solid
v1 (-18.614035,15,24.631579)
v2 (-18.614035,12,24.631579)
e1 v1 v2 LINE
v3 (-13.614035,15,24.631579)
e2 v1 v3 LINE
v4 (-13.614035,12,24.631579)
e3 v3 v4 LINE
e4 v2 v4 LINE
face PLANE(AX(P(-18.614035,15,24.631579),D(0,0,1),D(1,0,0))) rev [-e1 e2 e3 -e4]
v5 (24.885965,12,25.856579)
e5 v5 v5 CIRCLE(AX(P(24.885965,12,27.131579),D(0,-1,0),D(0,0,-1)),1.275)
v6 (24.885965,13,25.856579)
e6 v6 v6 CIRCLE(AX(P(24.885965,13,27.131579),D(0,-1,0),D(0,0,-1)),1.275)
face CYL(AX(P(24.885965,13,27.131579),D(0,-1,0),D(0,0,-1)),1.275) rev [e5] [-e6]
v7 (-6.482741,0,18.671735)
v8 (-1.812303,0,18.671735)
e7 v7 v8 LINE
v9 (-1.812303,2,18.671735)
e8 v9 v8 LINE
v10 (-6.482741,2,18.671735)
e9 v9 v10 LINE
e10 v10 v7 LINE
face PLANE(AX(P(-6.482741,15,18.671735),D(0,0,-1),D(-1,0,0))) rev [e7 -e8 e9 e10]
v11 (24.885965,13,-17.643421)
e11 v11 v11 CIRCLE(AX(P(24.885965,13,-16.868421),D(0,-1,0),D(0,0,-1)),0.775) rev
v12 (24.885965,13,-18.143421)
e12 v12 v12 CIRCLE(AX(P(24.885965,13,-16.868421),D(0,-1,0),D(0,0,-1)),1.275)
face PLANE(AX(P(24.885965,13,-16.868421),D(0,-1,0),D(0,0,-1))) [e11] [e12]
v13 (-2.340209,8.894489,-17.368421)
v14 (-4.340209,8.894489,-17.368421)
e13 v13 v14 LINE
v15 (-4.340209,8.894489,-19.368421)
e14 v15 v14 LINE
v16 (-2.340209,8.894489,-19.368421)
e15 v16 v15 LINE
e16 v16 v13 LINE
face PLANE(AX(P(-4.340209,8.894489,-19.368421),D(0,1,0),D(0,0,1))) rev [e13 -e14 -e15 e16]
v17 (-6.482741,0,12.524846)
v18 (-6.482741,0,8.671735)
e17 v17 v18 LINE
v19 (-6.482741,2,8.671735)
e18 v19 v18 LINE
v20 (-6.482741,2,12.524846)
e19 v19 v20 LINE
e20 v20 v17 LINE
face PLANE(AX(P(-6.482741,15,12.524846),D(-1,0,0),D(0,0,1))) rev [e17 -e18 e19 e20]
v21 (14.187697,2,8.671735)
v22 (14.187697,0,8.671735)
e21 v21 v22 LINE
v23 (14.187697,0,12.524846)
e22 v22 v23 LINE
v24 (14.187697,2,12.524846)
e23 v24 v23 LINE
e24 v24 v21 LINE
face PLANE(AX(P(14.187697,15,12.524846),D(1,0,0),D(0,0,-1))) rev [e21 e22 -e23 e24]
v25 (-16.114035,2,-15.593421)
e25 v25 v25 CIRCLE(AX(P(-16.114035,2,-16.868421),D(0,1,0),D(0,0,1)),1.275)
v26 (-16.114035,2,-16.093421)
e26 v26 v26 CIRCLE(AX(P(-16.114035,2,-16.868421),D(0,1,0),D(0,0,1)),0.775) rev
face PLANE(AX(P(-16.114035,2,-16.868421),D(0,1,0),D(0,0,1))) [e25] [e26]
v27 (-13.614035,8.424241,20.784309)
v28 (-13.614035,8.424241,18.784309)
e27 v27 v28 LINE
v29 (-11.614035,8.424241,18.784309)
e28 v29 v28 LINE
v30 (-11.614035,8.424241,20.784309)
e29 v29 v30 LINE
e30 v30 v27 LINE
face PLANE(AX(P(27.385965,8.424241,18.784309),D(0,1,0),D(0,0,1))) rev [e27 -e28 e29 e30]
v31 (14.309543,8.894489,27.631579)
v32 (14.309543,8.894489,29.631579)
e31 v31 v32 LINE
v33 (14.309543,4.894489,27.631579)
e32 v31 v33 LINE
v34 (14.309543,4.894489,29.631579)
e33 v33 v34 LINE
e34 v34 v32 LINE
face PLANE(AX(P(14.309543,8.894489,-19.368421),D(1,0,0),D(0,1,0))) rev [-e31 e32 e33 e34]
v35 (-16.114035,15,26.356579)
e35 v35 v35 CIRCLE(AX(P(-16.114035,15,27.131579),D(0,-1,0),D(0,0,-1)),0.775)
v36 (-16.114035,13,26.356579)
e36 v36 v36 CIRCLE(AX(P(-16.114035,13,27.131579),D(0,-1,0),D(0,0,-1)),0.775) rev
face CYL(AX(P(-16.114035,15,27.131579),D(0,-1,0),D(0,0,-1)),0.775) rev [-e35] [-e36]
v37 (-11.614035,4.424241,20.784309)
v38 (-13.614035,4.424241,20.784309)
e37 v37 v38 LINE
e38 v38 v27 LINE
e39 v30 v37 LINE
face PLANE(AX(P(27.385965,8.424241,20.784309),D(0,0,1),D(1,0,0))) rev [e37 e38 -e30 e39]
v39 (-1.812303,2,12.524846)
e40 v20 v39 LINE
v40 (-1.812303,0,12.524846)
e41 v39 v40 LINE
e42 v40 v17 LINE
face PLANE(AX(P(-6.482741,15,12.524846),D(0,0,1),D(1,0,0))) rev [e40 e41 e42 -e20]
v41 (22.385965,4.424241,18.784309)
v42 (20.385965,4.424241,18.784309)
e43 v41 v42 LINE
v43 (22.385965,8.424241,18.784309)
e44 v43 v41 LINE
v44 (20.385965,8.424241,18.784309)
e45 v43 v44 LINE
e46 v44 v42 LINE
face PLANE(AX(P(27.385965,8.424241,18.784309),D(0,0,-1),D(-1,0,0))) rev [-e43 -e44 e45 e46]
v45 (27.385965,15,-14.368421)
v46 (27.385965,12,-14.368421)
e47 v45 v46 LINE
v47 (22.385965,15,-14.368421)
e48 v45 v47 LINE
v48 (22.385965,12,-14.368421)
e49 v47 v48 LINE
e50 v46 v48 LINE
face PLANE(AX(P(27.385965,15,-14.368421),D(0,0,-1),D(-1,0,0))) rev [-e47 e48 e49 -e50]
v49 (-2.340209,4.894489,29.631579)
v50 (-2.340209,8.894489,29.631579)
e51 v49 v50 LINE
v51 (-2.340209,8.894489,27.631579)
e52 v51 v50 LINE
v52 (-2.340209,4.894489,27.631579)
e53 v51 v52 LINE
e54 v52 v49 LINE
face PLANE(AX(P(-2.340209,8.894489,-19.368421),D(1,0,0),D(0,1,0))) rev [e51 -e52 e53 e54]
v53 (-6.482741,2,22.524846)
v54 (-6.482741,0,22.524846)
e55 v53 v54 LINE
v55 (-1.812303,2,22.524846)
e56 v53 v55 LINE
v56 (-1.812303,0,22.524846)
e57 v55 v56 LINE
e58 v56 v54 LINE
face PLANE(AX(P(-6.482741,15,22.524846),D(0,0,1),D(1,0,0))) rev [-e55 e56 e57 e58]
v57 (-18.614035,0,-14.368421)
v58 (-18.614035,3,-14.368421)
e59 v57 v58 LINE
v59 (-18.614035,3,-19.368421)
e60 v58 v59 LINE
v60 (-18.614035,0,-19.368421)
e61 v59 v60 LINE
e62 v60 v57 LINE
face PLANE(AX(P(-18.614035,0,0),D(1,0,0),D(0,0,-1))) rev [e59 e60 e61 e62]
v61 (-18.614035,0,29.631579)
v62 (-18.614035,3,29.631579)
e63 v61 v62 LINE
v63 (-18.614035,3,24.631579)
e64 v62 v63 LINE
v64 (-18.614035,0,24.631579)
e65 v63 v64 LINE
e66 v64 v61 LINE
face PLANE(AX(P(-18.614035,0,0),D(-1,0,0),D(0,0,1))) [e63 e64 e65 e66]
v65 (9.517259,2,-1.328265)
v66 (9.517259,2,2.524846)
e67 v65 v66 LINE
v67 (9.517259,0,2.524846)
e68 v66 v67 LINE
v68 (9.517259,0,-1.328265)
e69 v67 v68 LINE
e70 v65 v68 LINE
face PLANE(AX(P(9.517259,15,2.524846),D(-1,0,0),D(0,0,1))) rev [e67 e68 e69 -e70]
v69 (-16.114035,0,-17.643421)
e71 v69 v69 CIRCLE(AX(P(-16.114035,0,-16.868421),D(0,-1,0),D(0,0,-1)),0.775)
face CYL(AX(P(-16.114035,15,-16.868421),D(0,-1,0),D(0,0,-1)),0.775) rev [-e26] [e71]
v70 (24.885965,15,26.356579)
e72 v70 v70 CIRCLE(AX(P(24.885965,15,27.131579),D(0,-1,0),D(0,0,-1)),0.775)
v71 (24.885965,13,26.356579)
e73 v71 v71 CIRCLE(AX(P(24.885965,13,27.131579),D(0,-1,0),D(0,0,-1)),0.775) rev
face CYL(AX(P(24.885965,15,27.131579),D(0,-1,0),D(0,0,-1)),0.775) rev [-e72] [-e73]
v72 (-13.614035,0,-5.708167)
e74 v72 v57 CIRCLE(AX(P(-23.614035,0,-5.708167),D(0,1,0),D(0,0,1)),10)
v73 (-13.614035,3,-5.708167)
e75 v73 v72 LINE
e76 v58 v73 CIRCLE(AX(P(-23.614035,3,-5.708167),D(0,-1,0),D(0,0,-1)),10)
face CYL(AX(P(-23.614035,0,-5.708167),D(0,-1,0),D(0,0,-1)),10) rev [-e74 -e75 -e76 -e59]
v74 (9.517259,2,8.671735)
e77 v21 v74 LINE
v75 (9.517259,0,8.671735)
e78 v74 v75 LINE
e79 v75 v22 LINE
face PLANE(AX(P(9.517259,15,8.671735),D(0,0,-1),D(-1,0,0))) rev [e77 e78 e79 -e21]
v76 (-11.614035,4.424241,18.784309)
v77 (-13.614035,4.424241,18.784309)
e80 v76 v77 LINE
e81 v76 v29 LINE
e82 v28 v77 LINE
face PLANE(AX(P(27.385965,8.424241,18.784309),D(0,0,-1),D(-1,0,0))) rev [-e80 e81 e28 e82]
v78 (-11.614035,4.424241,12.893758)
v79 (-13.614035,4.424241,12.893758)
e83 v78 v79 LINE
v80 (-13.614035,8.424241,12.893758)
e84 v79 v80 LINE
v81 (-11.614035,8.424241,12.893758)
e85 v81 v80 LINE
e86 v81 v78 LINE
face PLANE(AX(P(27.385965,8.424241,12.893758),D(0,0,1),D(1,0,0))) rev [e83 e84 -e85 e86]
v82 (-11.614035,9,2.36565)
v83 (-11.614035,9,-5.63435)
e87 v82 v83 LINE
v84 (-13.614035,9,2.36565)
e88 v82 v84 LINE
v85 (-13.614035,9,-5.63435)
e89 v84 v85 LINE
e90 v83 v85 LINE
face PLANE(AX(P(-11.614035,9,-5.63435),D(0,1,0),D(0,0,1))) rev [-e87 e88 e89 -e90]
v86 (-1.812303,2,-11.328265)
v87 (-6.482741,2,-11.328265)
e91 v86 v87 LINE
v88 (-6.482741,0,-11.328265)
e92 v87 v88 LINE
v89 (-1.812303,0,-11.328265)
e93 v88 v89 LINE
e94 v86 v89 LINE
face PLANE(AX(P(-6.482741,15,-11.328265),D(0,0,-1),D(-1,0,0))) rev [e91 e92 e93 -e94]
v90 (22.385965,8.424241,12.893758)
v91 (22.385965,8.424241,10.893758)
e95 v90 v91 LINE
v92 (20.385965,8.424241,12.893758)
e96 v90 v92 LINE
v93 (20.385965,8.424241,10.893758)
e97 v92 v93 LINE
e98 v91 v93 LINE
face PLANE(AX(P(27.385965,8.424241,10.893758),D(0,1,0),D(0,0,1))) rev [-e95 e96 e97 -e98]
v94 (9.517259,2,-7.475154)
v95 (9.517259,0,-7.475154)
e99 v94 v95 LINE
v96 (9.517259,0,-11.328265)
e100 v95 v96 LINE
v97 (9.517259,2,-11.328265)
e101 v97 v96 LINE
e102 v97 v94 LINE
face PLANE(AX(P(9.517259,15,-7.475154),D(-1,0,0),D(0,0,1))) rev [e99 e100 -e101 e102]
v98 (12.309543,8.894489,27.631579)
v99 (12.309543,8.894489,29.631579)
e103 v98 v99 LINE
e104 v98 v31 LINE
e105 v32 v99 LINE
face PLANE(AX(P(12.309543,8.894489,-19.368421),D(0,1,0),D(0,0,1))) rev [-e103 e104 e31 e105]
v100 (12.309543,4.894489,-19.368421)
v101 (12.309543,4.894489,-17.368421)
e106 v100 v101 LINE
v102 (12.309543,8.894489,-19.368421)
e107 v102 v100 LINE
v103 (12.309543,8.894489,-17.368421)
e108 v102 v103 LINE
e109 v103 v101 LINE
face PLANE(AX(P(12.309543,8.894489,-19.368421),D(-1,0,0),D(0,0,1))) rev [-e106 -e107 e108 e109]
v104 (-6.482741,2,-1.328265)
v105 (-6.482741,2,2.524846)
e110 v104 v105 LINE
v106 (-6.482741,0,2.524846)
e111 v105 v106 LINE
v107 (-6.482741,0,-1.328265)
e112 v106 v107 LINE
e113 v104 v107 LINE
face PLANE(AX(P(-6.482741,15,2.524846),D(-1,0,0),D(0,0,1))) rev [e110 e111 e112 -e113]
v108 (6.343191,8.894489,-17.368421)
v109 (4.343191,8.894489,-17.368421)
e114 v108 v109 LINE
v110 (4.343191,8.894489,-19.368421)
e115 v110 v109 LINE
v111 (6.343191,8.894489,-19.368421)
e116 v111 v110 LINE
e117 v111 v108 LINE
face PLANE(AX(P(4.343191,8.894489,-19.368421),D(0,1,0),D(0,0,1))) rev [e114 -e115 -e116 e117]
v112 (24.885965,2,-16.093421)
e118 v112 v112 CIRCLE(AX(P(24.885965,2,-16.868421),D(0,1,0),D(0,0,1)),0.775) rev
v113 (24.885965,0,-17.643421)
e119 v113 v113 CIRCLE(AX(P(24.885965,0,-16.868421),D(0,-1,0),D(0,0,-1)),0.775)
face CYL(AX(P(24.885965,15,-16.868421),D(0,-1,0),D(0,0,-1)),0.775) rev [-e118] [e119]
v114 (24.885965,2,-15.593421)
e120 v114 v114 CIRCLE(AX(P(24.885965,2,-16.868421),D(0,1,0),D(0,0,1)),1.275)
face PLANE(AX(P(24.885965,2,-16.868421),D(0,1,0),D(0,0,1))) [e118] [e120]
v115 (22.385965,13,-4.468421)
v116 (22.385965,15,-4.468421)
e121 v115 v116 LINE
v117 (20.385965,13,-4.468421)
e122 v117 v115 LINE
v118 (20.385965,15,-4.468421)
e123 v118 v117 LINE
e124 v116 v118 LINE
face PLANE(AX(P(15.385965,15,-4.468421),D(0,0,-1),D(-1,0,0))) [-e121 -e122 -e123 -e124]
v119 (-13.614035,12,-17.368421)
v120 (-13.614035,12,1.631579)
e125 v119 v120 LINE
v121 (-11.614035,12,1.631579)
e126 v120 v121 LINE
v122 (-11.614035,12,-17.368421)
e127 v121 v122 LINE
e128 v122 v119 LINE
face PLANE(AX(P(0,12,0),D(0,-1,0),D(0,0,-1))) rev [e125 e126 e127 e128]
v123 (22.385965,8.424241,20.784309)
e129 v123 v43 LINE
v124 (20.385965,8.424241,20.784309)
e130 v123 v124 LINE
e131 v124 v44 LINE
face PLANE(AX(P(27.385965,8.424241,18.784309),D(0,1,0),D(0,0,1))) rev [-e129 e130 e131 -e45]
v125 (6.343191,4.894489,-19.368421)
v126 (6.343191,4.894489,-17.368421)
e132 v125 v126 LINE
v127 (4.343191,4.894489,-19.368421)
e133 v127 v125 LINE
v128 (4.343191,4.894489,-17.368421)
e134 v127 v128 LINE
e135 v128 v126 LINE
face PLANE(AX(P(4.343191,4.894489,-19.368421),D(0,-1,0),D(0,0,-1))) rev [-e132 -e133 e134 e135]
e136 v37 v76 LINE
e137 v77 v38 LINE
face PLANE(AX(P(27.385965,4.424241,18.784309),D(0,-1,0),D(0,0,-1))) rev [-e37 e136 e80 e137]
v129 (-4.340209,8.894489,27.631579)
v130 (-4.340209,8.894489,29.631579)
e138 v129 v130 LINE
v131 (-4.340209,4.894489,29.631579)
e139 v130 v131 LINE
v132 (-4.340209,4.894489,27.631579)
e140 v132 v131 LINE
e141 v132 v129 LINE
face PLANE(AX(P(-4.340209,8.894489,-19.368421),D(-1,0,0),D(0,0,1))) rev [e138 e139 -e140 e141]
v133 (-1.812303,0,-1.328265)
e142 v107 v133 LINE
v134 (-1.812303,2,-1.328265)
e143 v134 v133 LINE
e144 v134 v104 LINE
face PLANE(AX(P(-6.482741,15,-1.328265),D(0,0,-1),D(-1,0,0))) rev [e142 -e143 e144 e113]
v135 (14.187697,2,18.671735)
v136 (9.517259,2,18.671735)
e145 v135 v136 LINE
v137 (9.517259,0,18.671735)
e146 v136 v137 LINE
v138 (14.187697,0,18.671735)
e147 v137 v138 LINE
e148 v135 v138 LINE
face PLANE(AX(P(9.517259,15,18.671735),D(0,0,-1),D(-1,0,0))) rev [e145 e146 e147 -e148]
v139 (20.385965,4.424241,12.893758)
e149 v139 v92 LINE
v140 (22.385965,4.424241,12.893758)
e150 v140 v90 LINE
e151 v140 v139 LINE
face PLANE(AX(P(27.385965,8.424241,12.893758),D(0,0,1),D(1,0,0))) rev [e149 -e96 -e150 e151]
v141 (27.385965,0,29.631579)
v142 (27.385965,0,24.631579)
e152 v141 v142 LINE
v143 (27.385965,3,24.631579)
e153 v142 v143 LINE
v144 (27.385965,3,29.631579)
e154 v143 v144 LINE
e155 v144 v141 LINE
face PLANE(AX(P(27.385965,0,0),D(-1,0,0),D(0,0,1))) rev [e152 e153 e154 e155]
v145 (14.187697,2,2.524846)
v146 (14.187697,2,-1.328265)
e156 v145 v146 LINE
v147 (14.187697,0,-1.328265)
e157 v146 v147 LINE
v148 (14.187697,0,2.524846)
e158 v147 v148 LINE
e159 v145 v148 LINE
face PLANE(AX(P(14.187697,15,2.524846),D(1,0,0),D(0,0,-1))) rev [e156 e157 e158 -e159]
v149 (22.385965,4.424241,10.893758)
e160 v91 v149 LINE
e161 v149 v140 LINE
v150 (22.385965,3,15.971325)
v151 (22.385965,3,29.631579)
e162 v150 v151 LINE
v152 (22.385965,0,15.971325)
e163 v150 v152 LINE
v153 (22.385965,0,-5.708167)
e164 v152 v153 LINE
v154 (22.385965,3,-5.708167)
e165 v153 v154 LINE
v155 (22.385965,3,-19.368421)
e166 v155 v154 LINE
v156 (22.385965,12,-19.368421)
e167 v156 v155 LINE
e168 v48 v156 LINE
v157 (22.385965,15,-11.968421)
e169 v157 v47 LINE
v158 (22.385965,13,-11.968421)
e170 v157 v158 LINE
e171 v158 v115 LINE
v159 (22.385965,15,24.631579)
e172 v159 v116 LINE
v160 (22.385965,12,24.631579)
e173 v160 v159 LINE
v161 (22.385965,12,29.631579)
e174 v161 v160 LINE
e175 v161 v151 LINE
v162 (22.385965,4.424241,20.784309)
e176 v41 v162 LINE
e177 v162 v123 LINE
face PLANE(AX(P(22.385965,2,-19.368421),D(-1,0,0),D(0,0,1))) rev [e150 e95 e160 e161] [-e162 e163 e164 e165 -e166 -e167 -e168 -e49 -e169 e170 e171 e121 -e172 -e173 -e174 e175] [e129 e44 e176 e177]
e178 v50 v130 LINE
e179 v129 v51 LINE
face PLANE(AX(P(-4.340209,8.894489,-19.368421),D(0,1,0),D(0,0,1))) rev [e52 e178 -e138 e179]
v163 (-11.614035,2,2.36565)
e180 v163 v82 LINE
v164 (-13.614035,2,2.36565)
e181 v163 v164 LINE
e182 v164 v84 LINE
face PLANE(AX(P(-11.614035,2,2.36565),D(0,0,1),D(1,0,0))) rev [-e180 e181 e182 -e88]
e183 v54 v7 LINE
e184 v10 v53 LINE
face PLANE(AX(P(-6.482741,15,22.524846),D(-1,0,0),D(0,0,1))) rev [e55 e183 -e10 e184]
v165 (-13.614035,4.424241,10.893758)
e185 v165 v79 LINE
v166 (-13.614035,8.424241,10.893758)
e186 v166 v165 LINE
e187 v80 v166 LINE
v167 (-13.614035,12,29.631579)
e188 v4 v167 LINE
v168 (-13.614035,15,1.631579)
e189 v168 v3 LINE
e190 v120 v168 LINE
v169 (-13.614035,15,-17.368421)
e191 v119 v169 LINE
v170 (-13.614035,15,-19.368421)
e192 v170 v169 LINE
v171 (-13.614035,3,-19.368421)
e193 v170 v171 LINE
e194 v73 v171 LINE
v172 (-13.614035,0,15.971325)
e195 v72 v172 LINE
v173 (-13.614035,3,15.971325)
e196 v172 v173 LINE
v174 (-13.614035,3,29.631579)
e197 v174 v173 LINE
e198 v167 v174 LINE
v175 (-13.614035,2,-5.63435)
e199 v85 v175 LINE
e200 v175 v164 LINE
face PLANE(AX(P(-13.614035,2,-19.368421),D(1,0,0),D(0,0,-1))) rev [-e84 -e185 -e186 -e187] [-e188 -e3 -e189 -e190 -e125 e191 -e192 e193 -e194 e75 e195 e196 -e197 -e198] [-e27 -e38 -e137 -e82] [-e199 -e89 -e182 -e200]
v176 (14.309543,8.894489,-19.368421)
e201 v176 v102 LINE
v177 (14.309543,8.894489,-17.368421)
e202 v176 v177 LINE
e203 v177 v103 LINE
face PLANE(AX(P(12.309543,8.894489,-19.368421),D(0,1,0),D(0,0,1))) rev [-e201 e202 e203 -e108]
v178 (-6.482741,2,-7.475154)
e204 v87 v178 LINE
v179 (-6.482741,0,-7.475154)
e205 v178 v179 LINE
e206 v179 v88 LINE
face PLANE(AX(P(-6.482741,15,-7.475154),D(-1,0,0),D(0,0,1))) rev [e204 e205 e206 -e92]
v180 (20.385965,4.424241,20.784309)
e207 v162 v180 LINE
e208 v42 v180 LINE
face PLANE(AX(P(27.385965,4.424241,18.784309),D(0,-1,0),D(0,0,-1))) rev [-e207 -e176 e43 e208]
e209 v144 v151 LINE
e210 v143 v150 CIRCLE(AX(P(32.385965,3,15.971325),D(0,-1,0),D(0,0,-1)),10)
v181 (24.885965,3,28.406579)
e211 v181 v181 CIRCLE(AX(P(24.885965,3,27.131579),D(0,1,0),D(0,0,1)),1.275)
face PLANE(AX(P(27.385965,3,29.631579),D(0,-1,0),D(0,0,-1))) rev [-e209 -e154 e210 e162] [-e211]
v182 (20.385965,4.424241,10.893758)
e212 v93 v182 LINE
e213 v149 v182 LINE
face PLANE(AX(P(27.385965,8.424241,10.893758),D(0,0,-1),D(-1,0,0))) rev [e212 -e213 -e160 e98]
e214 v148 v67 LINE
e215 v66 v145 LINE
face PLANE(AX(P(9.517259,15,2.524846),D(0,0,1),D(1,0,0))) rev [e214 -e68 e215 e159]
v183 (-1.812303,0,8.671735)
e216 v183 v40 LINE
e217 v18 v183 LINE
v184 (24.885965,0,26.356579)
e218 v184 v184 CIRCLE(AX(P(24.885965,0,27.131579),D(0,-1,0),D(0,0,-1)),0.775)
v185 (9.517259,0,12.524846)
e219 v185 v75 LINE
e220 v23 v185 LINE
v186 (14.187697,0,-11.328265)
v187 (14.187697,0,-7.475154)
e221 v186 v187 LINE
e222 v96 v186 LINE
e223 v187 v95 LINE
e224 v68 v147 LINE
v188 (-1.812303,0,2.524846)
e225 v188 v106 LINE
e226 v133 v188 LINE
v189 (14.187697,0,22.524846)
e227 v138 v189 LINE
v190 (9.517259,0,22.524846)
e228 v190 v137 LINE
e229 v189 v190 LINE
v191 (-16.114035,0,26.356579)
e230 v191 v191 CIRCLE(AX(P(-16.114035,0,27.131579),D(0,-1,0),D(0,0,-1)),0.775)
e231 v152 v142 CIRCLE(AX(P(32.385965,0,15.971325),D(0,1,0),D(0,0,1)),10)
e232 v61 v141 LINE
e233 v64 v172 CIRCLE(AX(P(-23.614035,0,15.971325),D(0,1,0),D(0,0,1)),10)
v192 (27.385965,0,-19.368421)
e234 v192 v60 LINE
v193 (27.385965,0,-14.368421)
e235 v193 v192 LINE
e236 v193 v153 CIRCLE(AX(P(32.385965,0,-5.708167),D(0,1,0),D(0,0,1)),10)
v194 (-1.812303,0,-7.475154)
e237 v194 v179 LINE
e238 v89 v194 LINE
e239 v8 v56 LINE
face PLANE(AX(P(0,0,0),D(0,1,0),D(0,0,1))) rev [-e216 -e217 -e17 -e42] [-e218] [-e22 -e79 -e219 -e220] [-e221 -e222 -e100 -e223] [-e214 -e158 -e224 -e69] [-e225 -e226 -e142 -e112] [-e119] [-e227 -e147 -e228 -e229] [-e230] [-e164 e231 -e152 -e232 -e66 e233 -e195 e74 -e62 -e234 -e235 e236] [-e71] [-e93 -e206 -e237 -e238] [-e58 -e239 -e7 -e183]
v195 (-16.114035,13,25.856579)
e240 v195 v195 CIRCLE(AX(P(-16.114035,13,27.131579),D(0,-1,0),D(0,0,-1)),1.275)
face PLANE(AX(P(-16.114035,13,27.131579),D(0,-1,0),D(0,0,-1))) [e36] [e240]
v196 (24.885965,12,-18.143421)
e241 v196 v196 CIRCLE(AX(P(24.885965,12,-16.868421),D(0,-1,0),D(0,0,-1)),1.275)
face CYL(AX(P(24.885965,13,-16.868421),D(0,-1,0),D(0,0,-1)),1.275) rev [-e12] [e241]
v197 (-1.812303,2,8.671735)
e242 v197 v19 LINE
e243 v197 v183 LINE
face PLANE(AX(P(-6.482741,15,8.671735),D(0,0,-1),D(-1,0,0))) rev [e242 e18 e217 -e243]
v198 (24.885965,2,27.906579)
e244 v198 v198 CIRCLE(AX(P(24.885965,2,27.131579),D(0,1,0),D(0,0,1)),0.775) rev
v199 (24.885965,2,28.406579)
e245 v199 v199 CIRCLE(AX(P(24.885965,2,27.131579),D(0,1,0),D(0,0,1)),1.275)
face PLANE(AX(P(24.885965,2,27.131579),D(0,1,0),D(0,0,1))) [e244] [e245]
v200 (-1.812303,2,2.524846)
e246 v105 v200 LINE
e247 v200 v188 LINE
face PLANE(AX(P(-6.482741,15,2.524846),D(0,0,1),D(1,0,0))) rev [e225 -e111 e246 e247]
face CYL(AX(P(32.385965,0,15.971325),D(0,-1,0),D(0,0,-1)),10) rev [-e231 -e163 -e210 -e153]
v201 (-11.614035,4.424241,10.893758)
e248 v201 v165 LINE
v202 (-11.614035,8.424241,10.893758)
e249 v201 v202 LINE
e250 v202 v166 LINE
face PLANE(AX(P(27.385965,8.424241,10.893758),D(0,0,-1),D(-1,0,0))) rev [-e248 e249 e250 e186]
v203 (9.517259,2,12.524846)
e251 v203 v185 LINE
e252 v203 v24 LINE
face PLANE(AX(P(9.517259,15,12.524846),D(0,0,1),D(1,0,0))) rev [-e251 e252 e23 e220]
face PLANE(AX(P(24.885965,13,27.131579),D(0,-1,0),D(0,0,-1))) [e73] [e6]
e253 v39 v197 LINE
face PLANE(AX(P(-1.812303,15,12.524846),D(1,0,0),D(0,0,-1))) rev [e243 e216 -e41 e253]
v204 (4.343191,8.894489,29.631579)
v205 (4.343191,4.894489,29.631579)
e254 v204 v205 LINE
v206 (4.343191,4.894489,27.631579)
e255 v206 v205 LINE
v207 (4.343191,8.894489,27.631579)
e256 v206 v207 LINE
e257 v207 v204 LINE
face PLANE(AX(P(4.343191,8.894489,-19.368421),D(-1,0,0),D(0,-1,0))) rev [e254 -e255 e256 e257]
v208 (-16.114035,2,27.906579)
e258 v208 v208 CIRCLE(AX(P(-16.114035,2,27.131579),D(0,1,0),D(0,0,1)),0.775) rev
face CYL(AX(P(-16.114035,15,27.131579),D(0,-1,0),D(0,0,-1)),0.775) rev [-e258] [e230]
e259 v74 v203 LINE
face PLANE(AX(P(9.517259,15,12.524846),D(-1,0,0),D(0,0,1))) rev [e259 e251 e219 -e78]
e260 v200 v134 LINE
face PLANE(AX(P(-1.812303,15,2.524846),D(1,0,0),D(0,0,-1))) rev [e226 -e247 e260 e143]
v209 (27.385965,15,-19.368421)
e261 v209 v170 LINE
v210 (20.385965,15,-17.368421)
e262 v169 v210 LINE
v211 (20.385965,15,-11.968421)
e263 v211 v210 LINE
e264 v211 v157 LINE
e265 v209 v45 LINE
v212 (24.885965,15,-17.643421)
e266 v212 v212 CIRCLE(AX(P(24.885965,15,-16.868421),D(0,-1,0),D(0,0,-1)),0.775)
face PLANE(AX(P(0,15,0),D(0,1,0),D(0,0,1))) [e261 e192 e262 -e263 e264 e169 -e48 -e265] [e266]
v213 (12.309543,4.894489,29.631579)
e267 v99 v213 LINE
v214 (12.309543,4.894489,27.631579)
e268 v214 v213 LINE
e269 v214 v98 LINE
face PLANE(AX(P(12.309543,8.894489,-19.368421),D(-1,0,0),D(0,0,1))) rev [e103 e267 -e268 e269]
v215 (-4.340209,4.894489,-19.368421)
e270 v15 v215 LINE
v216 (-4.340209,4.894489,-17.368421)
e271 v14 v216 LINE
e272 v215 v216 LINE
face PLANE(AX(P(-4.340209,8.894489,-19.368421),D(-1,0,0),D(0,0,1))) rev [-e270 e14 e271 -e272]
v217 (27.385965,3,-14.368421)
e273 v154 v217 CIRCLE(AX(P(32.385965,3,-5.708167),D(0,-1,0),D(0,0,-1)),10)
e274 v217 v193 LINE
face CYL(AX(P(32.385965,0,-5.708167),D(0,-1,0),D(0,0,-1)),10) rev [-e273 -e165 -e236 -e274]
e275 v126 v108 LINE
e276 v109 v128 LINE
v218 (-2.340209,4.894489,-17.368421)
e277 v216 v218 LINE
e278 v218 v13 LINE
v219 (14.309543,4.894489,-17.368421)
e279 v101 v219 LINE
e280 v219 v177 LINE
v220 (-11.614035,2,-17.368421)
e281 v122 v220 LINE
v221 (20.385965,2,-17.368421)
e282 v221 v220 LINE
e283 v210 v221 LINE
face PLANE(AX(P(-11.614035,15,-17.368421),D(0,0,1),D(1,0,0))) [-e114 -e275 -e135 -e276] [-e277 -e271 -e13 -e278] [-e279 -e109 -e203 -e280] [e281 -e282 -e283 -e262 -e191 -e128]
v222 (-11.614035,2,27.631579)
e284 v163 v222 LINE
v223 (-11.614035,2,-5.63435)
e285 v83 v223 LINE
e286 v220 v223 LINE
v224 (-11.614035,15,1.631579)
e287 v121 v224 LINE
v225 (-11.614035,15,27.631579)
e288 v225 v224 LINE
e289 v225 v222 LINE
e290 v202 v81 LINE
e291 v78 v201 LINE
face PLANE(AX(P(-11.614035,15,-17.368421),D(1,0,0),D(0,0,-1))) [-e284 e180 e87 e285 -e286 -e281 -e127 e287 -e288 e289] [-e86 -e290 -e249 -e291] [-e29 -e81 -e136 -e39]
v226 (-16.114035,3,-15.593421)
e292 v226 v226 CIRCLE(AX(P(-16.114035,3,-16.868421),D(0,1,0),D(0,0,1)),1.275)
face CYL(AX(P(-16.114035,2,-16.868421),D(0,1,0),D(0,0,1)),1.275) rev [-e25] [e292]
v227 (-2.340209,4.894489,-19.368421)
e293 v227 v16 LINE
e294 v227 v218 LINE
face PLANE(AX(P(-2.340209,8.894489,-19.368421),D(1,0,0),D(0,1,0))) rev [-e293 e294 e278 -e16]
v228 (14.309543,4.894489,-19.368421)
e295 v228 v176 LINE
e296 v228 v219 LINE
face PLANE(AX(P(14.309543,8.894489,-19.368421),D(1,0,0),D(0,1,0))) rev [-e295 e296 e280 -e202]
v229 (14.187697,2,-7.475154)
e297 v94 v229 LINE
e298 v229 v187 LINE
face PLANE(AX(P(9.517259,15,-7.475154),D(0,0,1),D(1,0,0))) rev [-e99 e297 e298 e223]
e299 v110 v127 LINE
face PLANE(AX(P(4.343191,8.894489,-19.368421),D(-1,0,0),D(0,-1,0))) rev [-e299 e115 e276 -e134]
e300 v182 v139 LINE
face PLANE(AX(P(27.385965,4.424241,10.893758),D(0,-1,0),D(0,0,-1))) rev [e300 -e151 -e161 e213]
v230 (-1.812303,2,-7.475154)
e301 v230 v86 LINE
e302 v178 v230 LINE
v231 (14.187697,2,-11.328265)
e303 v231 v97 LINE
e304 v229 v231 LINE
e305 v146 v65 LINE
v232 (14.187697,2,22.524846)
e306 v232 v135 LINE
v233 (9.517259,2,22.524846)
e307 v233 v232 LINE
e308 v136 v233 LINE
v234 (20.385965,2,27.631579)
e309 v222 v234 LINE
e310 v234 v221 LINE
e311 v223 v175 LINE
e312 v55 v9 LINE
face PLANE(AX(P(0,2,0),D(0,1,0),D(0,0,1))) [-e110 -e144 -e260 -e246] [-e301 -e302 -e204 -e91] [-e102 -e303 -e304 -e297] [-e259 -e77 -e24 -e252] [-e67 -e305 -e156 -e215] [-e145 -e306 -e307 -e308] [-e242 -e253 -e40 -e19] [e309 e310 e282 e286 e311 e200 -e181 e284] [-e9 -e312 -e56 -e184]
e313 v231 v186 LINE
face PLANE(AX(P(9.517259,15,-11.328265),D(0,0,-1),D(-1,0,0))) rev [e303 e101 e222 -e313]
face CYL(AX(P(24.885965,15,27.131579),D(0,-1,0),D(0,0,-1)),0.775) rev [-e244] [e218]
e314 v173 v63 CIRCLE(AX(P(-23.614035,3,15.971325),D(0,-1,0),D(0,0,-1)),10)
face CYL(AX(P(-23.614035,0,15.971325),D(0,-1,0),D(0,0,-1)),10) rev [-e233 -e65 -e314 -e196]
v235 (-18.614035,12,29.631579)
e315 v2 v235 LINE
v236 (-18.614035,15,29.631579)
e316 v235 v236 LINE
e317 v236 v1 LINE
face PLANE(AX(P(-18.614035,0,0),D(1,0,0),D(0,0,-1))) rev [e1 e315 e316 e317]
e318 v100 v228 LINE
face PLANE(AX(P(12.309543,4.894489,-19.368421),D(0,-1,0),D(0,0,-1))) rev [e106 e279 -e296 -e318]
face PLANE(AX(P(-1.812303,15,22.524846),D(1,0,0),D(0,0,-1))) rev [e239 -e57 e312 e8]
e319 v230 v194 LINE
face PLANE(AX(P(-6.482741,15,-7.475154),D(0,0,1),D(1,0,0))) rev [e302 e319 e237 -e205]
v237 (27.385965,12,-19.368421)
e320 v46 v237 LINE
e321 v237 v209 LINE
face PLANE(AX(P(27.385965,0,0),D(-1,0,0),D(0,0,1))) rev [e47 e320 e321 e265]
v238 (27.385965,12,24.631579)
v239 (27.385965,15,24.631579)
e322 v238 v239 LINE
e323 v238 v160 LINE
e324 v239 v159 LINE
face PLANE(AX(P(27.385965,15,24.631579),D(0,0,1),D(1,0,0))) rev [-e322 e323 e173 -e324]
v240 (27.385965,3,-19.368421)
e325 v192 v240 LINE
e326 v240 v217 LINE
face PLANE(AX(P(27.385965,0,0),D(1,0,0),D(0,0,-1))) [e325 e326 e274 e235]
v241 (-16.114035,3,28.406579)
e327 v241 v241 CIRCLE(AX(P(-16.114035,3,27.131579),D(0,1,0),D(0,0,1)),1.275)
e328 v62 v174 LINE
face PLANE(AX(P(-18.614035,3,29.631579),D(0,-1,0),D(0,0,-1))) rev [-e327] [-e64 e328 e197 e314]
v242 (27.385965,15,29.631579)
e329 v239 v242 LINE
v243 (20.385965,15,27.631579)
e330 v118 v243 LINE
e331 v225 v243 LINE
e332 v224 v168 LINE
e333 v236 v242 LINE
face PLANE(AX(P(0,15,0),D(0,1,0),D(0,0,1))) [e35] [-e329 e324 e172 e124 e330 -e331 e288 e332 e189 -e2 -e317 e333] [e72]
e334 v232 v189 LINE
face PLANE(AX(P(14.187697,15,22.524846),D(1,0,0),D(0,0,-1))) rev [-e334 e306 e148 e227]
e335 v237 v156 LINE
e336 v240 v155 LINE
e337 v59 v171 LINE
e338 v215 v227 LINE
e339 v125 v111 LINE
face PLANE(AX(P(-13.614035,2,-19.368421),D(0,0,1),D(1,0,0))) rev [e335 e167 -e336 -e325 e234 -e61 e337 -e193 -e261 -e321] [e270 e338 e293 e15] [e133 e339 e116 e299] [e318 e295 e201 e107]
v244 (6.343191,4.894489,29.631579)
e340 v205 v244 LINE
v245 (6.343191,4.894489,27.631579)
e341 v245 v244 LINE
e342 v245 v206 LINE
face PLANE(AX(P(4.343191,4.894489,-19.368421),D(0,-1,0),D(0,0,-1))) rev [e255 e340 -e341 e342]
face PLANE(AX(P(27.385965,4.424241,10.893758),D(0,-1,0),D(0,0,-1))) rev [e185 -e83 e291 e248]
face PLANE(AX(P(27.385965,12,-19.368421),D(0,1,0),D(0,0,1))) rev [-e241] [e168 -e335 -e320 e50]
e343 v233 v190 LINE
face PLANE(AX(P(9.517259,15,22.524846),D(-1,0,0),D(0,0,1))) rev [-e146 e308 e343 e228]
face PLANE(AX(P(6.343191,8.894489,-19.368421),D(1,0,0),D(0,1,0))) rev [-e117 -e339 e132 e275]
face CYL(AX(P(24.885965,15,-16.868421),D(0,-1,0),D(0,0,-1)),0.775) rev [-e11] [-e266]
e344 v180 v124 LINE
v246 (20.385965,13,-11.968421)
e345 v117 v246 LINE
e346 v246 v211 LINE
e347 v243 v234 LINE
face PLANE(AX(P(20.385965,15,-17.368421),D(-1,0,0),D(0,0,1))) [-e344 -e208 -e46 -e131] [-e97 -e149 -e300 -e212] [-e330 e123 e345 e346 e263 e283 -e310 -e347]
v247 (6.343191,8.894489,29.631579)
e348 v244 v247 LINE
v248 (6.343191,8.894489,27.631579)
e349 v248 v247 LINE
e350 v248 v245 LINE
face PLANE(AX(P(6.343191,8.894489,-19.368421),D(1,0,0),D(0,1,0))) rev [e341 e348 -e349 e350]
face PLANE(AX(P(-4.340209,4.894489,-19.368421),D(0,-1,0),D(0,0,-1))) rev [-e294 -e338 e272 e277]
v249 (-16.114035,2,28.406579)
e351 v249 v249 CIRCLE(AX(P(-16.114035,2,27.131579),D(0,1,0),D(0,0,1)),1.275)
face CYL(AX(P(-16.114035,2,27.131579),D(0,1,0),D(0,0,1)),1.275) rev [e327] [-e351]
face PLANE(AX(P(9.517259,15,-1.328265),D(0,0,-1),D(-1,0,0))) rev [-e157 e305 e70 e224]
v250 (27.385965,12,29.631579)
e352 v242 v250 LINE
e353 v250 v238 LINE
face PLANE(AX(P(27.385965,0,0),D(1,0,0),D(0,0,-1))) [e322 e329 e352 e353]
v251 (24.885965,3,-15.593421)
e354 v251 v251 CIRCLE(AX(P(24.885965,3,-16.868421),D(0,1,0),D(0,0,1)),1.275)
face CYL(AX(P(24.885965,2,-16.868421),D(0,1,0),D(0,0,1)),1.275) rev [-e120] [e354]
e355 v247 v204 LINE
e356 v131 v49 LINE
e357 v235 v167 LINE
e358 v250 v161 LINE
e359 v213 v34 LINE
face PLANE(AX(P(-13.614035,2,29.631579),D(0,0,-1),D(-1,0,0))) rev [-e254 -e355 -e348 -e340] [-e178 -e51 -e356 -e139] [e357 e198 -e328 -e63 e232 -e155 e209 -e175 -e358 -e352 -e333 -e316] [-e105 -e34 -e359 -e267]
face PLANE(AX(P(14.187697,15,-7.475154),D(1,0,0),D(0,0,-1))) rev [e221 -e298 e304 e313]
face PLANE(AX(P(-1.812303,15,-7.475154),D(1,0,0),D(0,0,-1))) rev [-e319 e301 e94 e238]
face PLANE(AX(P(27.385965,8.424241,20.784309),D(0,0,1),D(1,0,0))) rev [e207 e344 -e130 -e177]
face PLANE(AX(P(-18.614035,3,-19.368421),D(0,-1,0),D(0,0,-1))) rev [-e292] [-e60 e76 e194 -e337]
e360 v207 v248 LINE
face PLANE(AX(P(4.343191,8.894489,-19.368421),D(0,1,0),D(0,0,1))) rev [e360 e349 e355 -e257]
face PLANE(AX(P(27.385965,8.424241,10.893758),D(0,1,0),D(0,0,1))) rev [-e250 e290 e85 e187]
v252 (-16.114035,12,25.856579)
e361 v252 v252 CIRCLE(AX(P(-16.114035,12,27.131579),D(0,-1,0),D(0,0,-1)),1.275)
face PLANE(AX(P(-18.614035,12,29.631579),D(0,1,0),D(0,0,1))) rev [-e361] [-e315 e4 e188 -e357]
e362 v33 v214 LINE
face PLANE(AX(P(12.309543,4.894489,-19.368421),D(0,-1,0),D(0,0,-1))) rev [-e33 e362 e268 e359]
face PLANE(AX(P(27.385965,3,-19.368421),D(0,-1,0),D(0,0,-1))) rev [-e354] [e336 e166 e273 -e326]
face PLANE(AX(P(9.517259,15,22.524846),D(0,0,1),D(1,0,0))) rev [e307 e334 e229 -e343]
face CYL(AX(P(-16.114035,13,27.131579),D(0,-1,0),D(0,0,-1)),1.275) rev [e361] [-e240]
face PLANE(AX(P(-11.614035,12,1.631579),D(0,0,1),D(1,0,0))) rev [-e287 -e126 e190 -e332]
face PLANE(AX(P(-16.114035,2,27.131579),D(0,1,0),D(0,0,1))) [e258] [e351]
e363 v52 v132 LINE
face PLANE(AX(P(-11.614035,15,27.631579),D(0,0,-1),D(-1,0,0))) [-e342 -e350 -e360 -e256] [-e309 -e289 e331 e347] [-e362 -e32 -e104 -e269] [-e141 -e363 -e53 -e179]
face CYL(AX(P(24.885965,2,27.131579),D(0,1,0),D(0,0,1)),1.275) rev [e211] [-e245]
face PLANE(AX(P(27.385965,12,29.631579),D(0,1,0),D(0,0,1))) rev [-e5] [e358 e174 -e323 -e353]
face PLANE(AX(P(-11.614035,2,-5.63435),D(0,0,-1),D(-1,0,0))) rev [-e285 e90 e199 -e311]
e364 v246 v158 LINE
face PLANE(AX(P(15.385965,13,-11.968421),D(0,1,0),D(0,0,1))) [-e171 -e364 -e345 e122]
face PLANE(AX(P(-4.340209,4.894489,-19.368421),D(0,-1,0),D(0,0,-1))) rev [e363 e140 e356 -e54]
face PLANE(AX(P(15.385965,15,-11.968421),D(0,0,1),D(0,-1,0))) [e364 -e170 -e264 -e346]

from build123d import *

# Parameters (mm, degrees)
SKETCH1_W               = 36
SKETCH1_H               = 49
BOSS_EXTRUDE1_DEPTH     = 2
SKETCH2_W               = 36
SKETCH2_H               = 49
SKETCH2_W_2             = 32
SKETCH2_H_2             = 45
BOSS_EXTRUDE2_DEPTH     = 13
CUT_EXTRUDE1_DEPTH      = 5
CUT_EXTRUDE1_DEPTH_BACK = 48.529259103
SKETCH3_W               = 7.5
SKETCH3_H               = 2
SKETCH4_W               = 4.670437484
SKETCH4_H               = 3.853110924
CUT_EXTRUDE2_DEPTH      = 41.051989913
SKETCH10_W              = 2
SKETCH10_H              = 19
CUT_EXTRUDE6_DEPTH      = 3
SKETCH11_W              = 8
SKETCH11_H              = 7
CUT_EXTRUDE7_DEPTH      = 2
SKETCH12_W              = 5
SKETCH12_H              = 3
BOSS_EXTRUDE3_DEPTH     = 5
SKETCH13_W              = 5
SKETCH13_H              = 3
BOSS_EXTRUDE4_DEPTH     = 5
SKETCH14_R              = 0.775
CUT_EXTRUDE8_DEPTH      = 44.046736753
SKETCH15_R              = 1.275
CUT_EXTRUDE9_DEPTH      = 1
CUT_EXTRUDE10_START     = -1
SKETCH16_R              = 1.275
CUT_EXTRUDE10_DEPTH     = 1
FILLET2_R               = 10
SKETCH17_W              = 2
SKETCH17_H              = 4
CUT_EXTRUDE11_DEPTH     = 59.103279375
SKETCH18_W              = 2
SKETCH18_H              = 4
CUT_EXTRUDE12_DEPTH     = 53.763912582
SKETCH19_W              = 37.08283529
SKETCH19_H              = 2
CUT_EXTRUDE13_DEPTH     = 2
SKETCH20_W              = 37.08283529
SKETCH20_H              = 2
BOSS_EXTRUDE5_DEPTH     = 2
SKETCH21_W              = 2
SKETCH21_H              = 28
CUT_EXTRUDE14_DEPTH     = 2
SKETCH22_W              = 2
SKETCH22_H              = 28
BOSS_EXTRUDE6_DEPTH     = 2
SKETCH23_W              = 2
SKETCH23_H              = 34.1
CUT_EXTRUDE16_DEPTH     = 1.5
SKETCH24_W              = 2
SKETCH24_H              = 34.1
BOSS_EXTRUDE7_DEPTH     = 1.5


with BuildPart() as part:
    # Sketch1 → Boss-Extrude1 (new body)
    with BuildSketch(Plane(origin=(0, 0, 0), x_dir=(1, 0, 0), z_dir=(0, 1, 0))):
        with Locations((4.385964912, -5.131578947)):
            Rectangle(SKETCH1_W, SKETCH1_H)
    extrude(amount=BOSS_EXTRUDE1_DEPTH)

    # Sketch2 → Boss-Extrude2 (add)
    with BuildSketch(Plane(origin=(0, 2, 0), x_dir=(1, 0, 0), z_dir=(0, 1, 0))):
        with Locations((4.385964912, -5.131578947)):
            Rectangle(SKETCH2_W, SKETCH2_H)
        with Locations((4.385964912, -5.131578947)):
            Rectangle(SKETCH2_W_2, SKETCH2_H_2, mode=Mode.SUBTRACT)
    extrude(amount=BOSS_EXTRUDE2_DEPTH)

    # Sketch3 → Cut-Extrude1 (cut, two sides: drawn at the far end of the back side and taken through both)
    with BuildSketch(Plane.ZY.offset(-20.385964912).offset(-CUT_EXTRUDE1_DEPTH_BACK)):
        with Locations((-8.218421053, 14)):
            Rectangle(SKETCH3_W, SKETCH3_H)
    extrude(amount=CUT_EXTRUDE1_DEPTH + CUT_EXTRUDE1_DEPTH_BACK, mode=Mode.SUBTRACT)

    # Sketch4 → Cut-Extrude2 (cut, through all)
    with BuildSketch(Plane.XZ):
        with Locations((11.852478182, 20.598290589)):
            Rectangle(SKETCH4_W, SKETCH4_H)
        with Locations((-4.147521818, 20.598290589)):
            Rectangle(SKETCH4_W, SKETCH4_H)
        with Locations((11.852478182, 10.598290589)):
            Rectangle(SKETCH4_W, SKETCH4_H)
        with Locations((11.852478182, 0.598290589)):
            Rectangle(SKETCH4_W, SKETCH4_H)
        with Locations((11.852478182, -9.401709411)):
            Rectangle(SKETCH4_W, SKETCH4_H)
        with Locations((-4.147521818, 10.598290589)):
            Rectangle(SKETCH4_W, SKETCH4_H)
        with Locations((-4.147521818, 0.598290589)):
            Rectangle(SKETCH4_W, SKETCH4_H)
        with Locations((-4.147521818, -9.401709411)):
            Rectangle(SKETCH4_W, SKETCH4_H)
    extrude(amount=-CUT_EXTRUDE2_DEPTH, mode=Mode.SUBTRACT)

    # Sketch10 → Cut-Extrude6 (cut)
    with BuildSketch(Plane(origin=(0, 15, 0), x_dir=(1, 0, 0), z_dir=(0, 1, 0))):
        with Locations((-12.614035088, 7.868421053)):
            Rectangle(SKETCH10_W, SKETCH10_H)
    extrude(amount=-CUT_EXTRUDE6_DEPTH, mode=Mode.SUBTRACT)

    # Sketch11 → Cut-Extrude7 (cut)
    with BuildSketch(Plane.ZY.offset(13.614035088)):
        with Locations((-1.634350226, 5.5)):
            Rectangle(SKETCH11_W, SKETCH11_H)
    extrude(amount=-CUT_EXTRUDE7_DEPTH, mode=Mode.SUBTRACT)

    # Sketch12 → Boss-Extrude3 (add)
    with BuildSketch(Plane.ZY.offset(13.614035088)):
        with Locations((-16.868421053, 1.5)):
            Rectangle(SKETCH12_W, SKETCH12_H)
        with Locations((27.131578947, 13.5)):
            Rectangle(SKETCH12_W, SKETCH12_H)
        with Locations((27.131578947, 1.5)):
            Rectangle(SKETCH12_W, SKETCH12_H)
    extrude(amount=BOSS_EXTRUDE3_DEPTH)

    # Sketch13 → Boss-Extrude4 (add)
    with BuildSketch(Plane(origin=(22.385964912, 0, 0), x_dir=(0, 0, -1), z_dir=(1, 0, 0))):
        with Locations((16.868421053, 1.5)):
            Rectangle(SKETCH13_W, SKETCH13_H)
        with Locations((-27.131578947, 13.5)):
            Rectangle(SKETCH13_W, SKETCH13_H)
        with Locations((-27.131578947, 1.5)):
            Rectangle(SKETCH13_W, SKETCH13_H)
        with Locations((16.868421053, 13.5)):
            Rectangle(SKETCH13_W, SKETCH13_H)
    extrude(amount=BOSS_EXTRUDE4_DEPTH)

    # Sketch14 → Cut-Extrude8 (cut, through all)
    with BuildSketch(Plane.XZ):
        with Locations(Location((24.885964912, -16.868421053, 0), (0, 0, 270))):
            Circle(SKETCH14_R)
        with Locations(Location((-16.114035088, -16.868421053, 0), (0, 0, 270))):
            Circle(SKETCH14_R)
        with Locations(Location((-16.114035088, 27.131578947, 0), (0, 0, 270))):
            Circle(SKETCH14_R)
        with Locations(Location((24.885964912, 27.131578947, 0), (0, 0, 270))):
            Circle(SKETCH14_R)
    extrude(amount=-CUT_EXTRUDE8_DEPTH, mode=Mode.SUBTRACT)

    # Sketch15 → Cut-Extrude9 (cut)
    with BuildSketch(Plane(origin=(0, 3, 0), x_dir=(1, 0, 0), z_dir=(0, 1, 0))):
        with Locations(Location((24.885964912, 16.868421053, 0), (0, 0, 270))):
            Circle(SKETCH15_R)
        with Locations(Location((24.885964912, -27.131578947, 0), (0, 0, 270))):
            Circle(SKETCH15_R)
        with Locations(Location((-16.114035088, -27.131578947, 0), (0, 0, 270))):
            Circle(SKETCH15_R)
        with Locations(Location((-16.114035088, 16.868421053, 0), (0, 0, 270))):
            Circle(SKETCH15_R)
    extrude(amount=-CUT_EXTRUDE9_DEPTH, mode=Mode.SUBTRACT)

    # Sketch16 → Cut-Extrude10 (cut)
    with BuildSketch(Plane.XZ.offset(-12).offset(CUT_EXTRUDE10_START)):
        with Locations(Location((-16.114035088, 27.131578947, 0), (0, 0, 90))):
            Circle(SKETCH16_R)
        with Locations(Location((24.885964912, 27.131578947, 0), (0, 0, 90))):
            Circle(SKETCH16_R)
        with Locations(Location((24.885964912, -16.868421053, 0), (0, 0, 90))):
            Circle(SKETCH16_R)
    extrude(amount=CUT_EXTRUDE10_DEPTH, mode=Mode.SUBTRACT)

    # Fillet2
    # the kernel refuses this fillet: 10 mm, written as the material it adds along each edge
    with BuildSketch(Plane(origin=(-13.614035088, 0, -14.368421053), x_dir=(0, 0, 1), z_dir=(0, 1, 0)), Plane(origin=(22.385964912, 0, 24.631578947), x_dir=(0, 0, -1), z_dir=(0, 1, 0))) as fillet2_piece_1:
        with BuildLine():
            CenterArc((8.660254038, -10), FILLET2_R, 90, 60)
            Line((0, -5), (0, 0))
            Line((0, 0), (8.660254038, 0))
        make_face()
    extrude(amount=3)
    with BuildSketch(Plane(origin=(22.385964912, 0, -14.368421053), x_dir=(0, 0, 1), z_dir=(0, 1, 0)), Plane(origin=(-13.614035088, 0, 24.631578947), x_dir=(0, 0, -1), z_dir=(0, 1, 0))) as fillet2_piece_2:
        with BuildLine():
            CenterArc((8.660254038, 10), FILLET2_R, 210, 60)
            Line((0, 5), (0, 0))
            Line((0, 0), (8.660254038, 0))
        make_face()
    extrude(amount=3)

    # Sketch17 → Cut-Extrude11 (cut, through all)
    with BuildSketch(Plane.XY.offset(29.631578947)):
        with Locations((-3.340209091, 6.894489406)):
            Rectangle(SKETCH17_W, SKETCH17_H)
        with Locations((5.343190897, 6.894489406)):
            Rectangle(SKETCH17_W, SKETCH17_H)
        with Locations((13.309543319, 6.894489406)):
            Rectangle(SKETCH17_W, SKETCH17_H)
    extrude(amount=-CUT_EXTRUDE11_DEPTH, mode=Mode.SUBTRACT)

    # Sketch18 → Cut-Extrude12 (cut, through all)
    with BuildSketch(Plane.ZY.offset(13.614035088)):
        with Locations((11.893757697, 6.4242408)):
            Rectangle(SKETCH18_W, SKETCH18_H)
        with Locations((19.784308777, 6.4242408)):
            Rectangle(SKETCH18_W, SKETCH18_H)
    extrude(amount=-CUT_EXTRUDE12_DEPTH, mode=Mode.SUBTRACT)

    # Sketch19 → Cut-Extrude13 (cut)
    with BuildSketch(Plane(origin=(0, 15, 0), x_dir=(1, 0, 0), z_dir=(0, 1, 0))):
        with Locations((4.927382557, 18.368421053)):
            Rectangle(SKETCH19_W, SKETCH19_H)
    extrude(amount=-CUT_EXTRUDE13_DEPTH, mode=Mode.SUBTRACT)

    # Sketch20 → Boss-Extrude5 (add)
    with BuildSketch(Plane(origin=(0, 13, 0), x_dir=(1, 0, 0), z_dir=(0, 1, 0))):
        with Locations((4.927382557, 18.368421053)):
            Rectangle(SKETCH20_W, SKETCH20_H)
    extrude(amount=BOSS_EXTRUDE5_DEPTH)

    # Sketch21 → Cut-Extrude14 (cut)
    with BuildSketch(Plane(origin=(0, 15, 0), x_dir=(1, 0, 0), z_dir=(0, 1, 0))):
        with Locations((-12.614035088, -15.631578947)):
            Rectangle(SKETCH21_W, SKETCH21_H)
    extrude(amount=-CUT_EXTRUDE14_DEPTH, mode=Mode.SUBTRACT)

    # Sketch22 → Boss-Extrude6 (add)
    with BuildSketch(Plane(origin=(0, 13, 0), x_dir=(1, 0, 0), z_dir=(0, 1, 0))):
        with Locations((-12.614035088, -15.631578947)):
            Rectangle(SKETCH22_W, SKETCH22_H)
    extrude(amount=BOSS_EXTRUDE6_DEPTH)

    # Sketch23 → Cut-Extrude16 (cut)
    with BuildSketch(Plane(origin=(0, 15, 0), x_dir=(1, 0, 0), z_dir=(0, 1, 0))):
        with Locations((21.385964912, -12.581578947)):
            Rectangle(SKETCH23_W, SKETCH23_H)
    extrude(amount=-CUT_EXTRUDE16_DEPTH, mode=Mode.SUBTRACT)

    # Sketch24 → Boss-Extrude7 (add)
    with BuildSketch(Plane(origin=(0, 13.5, 0), x_dir=(1, 0, 0), z_dir=(0, 1, 0))):
        with Locations((21.385964912, -12.581578947)):
            Rectangle(SKETCH24_W, SKETCH24_H)
    extrude(amount=BOSS_EXTRUDE7_DEPTH)


solid = part.part
